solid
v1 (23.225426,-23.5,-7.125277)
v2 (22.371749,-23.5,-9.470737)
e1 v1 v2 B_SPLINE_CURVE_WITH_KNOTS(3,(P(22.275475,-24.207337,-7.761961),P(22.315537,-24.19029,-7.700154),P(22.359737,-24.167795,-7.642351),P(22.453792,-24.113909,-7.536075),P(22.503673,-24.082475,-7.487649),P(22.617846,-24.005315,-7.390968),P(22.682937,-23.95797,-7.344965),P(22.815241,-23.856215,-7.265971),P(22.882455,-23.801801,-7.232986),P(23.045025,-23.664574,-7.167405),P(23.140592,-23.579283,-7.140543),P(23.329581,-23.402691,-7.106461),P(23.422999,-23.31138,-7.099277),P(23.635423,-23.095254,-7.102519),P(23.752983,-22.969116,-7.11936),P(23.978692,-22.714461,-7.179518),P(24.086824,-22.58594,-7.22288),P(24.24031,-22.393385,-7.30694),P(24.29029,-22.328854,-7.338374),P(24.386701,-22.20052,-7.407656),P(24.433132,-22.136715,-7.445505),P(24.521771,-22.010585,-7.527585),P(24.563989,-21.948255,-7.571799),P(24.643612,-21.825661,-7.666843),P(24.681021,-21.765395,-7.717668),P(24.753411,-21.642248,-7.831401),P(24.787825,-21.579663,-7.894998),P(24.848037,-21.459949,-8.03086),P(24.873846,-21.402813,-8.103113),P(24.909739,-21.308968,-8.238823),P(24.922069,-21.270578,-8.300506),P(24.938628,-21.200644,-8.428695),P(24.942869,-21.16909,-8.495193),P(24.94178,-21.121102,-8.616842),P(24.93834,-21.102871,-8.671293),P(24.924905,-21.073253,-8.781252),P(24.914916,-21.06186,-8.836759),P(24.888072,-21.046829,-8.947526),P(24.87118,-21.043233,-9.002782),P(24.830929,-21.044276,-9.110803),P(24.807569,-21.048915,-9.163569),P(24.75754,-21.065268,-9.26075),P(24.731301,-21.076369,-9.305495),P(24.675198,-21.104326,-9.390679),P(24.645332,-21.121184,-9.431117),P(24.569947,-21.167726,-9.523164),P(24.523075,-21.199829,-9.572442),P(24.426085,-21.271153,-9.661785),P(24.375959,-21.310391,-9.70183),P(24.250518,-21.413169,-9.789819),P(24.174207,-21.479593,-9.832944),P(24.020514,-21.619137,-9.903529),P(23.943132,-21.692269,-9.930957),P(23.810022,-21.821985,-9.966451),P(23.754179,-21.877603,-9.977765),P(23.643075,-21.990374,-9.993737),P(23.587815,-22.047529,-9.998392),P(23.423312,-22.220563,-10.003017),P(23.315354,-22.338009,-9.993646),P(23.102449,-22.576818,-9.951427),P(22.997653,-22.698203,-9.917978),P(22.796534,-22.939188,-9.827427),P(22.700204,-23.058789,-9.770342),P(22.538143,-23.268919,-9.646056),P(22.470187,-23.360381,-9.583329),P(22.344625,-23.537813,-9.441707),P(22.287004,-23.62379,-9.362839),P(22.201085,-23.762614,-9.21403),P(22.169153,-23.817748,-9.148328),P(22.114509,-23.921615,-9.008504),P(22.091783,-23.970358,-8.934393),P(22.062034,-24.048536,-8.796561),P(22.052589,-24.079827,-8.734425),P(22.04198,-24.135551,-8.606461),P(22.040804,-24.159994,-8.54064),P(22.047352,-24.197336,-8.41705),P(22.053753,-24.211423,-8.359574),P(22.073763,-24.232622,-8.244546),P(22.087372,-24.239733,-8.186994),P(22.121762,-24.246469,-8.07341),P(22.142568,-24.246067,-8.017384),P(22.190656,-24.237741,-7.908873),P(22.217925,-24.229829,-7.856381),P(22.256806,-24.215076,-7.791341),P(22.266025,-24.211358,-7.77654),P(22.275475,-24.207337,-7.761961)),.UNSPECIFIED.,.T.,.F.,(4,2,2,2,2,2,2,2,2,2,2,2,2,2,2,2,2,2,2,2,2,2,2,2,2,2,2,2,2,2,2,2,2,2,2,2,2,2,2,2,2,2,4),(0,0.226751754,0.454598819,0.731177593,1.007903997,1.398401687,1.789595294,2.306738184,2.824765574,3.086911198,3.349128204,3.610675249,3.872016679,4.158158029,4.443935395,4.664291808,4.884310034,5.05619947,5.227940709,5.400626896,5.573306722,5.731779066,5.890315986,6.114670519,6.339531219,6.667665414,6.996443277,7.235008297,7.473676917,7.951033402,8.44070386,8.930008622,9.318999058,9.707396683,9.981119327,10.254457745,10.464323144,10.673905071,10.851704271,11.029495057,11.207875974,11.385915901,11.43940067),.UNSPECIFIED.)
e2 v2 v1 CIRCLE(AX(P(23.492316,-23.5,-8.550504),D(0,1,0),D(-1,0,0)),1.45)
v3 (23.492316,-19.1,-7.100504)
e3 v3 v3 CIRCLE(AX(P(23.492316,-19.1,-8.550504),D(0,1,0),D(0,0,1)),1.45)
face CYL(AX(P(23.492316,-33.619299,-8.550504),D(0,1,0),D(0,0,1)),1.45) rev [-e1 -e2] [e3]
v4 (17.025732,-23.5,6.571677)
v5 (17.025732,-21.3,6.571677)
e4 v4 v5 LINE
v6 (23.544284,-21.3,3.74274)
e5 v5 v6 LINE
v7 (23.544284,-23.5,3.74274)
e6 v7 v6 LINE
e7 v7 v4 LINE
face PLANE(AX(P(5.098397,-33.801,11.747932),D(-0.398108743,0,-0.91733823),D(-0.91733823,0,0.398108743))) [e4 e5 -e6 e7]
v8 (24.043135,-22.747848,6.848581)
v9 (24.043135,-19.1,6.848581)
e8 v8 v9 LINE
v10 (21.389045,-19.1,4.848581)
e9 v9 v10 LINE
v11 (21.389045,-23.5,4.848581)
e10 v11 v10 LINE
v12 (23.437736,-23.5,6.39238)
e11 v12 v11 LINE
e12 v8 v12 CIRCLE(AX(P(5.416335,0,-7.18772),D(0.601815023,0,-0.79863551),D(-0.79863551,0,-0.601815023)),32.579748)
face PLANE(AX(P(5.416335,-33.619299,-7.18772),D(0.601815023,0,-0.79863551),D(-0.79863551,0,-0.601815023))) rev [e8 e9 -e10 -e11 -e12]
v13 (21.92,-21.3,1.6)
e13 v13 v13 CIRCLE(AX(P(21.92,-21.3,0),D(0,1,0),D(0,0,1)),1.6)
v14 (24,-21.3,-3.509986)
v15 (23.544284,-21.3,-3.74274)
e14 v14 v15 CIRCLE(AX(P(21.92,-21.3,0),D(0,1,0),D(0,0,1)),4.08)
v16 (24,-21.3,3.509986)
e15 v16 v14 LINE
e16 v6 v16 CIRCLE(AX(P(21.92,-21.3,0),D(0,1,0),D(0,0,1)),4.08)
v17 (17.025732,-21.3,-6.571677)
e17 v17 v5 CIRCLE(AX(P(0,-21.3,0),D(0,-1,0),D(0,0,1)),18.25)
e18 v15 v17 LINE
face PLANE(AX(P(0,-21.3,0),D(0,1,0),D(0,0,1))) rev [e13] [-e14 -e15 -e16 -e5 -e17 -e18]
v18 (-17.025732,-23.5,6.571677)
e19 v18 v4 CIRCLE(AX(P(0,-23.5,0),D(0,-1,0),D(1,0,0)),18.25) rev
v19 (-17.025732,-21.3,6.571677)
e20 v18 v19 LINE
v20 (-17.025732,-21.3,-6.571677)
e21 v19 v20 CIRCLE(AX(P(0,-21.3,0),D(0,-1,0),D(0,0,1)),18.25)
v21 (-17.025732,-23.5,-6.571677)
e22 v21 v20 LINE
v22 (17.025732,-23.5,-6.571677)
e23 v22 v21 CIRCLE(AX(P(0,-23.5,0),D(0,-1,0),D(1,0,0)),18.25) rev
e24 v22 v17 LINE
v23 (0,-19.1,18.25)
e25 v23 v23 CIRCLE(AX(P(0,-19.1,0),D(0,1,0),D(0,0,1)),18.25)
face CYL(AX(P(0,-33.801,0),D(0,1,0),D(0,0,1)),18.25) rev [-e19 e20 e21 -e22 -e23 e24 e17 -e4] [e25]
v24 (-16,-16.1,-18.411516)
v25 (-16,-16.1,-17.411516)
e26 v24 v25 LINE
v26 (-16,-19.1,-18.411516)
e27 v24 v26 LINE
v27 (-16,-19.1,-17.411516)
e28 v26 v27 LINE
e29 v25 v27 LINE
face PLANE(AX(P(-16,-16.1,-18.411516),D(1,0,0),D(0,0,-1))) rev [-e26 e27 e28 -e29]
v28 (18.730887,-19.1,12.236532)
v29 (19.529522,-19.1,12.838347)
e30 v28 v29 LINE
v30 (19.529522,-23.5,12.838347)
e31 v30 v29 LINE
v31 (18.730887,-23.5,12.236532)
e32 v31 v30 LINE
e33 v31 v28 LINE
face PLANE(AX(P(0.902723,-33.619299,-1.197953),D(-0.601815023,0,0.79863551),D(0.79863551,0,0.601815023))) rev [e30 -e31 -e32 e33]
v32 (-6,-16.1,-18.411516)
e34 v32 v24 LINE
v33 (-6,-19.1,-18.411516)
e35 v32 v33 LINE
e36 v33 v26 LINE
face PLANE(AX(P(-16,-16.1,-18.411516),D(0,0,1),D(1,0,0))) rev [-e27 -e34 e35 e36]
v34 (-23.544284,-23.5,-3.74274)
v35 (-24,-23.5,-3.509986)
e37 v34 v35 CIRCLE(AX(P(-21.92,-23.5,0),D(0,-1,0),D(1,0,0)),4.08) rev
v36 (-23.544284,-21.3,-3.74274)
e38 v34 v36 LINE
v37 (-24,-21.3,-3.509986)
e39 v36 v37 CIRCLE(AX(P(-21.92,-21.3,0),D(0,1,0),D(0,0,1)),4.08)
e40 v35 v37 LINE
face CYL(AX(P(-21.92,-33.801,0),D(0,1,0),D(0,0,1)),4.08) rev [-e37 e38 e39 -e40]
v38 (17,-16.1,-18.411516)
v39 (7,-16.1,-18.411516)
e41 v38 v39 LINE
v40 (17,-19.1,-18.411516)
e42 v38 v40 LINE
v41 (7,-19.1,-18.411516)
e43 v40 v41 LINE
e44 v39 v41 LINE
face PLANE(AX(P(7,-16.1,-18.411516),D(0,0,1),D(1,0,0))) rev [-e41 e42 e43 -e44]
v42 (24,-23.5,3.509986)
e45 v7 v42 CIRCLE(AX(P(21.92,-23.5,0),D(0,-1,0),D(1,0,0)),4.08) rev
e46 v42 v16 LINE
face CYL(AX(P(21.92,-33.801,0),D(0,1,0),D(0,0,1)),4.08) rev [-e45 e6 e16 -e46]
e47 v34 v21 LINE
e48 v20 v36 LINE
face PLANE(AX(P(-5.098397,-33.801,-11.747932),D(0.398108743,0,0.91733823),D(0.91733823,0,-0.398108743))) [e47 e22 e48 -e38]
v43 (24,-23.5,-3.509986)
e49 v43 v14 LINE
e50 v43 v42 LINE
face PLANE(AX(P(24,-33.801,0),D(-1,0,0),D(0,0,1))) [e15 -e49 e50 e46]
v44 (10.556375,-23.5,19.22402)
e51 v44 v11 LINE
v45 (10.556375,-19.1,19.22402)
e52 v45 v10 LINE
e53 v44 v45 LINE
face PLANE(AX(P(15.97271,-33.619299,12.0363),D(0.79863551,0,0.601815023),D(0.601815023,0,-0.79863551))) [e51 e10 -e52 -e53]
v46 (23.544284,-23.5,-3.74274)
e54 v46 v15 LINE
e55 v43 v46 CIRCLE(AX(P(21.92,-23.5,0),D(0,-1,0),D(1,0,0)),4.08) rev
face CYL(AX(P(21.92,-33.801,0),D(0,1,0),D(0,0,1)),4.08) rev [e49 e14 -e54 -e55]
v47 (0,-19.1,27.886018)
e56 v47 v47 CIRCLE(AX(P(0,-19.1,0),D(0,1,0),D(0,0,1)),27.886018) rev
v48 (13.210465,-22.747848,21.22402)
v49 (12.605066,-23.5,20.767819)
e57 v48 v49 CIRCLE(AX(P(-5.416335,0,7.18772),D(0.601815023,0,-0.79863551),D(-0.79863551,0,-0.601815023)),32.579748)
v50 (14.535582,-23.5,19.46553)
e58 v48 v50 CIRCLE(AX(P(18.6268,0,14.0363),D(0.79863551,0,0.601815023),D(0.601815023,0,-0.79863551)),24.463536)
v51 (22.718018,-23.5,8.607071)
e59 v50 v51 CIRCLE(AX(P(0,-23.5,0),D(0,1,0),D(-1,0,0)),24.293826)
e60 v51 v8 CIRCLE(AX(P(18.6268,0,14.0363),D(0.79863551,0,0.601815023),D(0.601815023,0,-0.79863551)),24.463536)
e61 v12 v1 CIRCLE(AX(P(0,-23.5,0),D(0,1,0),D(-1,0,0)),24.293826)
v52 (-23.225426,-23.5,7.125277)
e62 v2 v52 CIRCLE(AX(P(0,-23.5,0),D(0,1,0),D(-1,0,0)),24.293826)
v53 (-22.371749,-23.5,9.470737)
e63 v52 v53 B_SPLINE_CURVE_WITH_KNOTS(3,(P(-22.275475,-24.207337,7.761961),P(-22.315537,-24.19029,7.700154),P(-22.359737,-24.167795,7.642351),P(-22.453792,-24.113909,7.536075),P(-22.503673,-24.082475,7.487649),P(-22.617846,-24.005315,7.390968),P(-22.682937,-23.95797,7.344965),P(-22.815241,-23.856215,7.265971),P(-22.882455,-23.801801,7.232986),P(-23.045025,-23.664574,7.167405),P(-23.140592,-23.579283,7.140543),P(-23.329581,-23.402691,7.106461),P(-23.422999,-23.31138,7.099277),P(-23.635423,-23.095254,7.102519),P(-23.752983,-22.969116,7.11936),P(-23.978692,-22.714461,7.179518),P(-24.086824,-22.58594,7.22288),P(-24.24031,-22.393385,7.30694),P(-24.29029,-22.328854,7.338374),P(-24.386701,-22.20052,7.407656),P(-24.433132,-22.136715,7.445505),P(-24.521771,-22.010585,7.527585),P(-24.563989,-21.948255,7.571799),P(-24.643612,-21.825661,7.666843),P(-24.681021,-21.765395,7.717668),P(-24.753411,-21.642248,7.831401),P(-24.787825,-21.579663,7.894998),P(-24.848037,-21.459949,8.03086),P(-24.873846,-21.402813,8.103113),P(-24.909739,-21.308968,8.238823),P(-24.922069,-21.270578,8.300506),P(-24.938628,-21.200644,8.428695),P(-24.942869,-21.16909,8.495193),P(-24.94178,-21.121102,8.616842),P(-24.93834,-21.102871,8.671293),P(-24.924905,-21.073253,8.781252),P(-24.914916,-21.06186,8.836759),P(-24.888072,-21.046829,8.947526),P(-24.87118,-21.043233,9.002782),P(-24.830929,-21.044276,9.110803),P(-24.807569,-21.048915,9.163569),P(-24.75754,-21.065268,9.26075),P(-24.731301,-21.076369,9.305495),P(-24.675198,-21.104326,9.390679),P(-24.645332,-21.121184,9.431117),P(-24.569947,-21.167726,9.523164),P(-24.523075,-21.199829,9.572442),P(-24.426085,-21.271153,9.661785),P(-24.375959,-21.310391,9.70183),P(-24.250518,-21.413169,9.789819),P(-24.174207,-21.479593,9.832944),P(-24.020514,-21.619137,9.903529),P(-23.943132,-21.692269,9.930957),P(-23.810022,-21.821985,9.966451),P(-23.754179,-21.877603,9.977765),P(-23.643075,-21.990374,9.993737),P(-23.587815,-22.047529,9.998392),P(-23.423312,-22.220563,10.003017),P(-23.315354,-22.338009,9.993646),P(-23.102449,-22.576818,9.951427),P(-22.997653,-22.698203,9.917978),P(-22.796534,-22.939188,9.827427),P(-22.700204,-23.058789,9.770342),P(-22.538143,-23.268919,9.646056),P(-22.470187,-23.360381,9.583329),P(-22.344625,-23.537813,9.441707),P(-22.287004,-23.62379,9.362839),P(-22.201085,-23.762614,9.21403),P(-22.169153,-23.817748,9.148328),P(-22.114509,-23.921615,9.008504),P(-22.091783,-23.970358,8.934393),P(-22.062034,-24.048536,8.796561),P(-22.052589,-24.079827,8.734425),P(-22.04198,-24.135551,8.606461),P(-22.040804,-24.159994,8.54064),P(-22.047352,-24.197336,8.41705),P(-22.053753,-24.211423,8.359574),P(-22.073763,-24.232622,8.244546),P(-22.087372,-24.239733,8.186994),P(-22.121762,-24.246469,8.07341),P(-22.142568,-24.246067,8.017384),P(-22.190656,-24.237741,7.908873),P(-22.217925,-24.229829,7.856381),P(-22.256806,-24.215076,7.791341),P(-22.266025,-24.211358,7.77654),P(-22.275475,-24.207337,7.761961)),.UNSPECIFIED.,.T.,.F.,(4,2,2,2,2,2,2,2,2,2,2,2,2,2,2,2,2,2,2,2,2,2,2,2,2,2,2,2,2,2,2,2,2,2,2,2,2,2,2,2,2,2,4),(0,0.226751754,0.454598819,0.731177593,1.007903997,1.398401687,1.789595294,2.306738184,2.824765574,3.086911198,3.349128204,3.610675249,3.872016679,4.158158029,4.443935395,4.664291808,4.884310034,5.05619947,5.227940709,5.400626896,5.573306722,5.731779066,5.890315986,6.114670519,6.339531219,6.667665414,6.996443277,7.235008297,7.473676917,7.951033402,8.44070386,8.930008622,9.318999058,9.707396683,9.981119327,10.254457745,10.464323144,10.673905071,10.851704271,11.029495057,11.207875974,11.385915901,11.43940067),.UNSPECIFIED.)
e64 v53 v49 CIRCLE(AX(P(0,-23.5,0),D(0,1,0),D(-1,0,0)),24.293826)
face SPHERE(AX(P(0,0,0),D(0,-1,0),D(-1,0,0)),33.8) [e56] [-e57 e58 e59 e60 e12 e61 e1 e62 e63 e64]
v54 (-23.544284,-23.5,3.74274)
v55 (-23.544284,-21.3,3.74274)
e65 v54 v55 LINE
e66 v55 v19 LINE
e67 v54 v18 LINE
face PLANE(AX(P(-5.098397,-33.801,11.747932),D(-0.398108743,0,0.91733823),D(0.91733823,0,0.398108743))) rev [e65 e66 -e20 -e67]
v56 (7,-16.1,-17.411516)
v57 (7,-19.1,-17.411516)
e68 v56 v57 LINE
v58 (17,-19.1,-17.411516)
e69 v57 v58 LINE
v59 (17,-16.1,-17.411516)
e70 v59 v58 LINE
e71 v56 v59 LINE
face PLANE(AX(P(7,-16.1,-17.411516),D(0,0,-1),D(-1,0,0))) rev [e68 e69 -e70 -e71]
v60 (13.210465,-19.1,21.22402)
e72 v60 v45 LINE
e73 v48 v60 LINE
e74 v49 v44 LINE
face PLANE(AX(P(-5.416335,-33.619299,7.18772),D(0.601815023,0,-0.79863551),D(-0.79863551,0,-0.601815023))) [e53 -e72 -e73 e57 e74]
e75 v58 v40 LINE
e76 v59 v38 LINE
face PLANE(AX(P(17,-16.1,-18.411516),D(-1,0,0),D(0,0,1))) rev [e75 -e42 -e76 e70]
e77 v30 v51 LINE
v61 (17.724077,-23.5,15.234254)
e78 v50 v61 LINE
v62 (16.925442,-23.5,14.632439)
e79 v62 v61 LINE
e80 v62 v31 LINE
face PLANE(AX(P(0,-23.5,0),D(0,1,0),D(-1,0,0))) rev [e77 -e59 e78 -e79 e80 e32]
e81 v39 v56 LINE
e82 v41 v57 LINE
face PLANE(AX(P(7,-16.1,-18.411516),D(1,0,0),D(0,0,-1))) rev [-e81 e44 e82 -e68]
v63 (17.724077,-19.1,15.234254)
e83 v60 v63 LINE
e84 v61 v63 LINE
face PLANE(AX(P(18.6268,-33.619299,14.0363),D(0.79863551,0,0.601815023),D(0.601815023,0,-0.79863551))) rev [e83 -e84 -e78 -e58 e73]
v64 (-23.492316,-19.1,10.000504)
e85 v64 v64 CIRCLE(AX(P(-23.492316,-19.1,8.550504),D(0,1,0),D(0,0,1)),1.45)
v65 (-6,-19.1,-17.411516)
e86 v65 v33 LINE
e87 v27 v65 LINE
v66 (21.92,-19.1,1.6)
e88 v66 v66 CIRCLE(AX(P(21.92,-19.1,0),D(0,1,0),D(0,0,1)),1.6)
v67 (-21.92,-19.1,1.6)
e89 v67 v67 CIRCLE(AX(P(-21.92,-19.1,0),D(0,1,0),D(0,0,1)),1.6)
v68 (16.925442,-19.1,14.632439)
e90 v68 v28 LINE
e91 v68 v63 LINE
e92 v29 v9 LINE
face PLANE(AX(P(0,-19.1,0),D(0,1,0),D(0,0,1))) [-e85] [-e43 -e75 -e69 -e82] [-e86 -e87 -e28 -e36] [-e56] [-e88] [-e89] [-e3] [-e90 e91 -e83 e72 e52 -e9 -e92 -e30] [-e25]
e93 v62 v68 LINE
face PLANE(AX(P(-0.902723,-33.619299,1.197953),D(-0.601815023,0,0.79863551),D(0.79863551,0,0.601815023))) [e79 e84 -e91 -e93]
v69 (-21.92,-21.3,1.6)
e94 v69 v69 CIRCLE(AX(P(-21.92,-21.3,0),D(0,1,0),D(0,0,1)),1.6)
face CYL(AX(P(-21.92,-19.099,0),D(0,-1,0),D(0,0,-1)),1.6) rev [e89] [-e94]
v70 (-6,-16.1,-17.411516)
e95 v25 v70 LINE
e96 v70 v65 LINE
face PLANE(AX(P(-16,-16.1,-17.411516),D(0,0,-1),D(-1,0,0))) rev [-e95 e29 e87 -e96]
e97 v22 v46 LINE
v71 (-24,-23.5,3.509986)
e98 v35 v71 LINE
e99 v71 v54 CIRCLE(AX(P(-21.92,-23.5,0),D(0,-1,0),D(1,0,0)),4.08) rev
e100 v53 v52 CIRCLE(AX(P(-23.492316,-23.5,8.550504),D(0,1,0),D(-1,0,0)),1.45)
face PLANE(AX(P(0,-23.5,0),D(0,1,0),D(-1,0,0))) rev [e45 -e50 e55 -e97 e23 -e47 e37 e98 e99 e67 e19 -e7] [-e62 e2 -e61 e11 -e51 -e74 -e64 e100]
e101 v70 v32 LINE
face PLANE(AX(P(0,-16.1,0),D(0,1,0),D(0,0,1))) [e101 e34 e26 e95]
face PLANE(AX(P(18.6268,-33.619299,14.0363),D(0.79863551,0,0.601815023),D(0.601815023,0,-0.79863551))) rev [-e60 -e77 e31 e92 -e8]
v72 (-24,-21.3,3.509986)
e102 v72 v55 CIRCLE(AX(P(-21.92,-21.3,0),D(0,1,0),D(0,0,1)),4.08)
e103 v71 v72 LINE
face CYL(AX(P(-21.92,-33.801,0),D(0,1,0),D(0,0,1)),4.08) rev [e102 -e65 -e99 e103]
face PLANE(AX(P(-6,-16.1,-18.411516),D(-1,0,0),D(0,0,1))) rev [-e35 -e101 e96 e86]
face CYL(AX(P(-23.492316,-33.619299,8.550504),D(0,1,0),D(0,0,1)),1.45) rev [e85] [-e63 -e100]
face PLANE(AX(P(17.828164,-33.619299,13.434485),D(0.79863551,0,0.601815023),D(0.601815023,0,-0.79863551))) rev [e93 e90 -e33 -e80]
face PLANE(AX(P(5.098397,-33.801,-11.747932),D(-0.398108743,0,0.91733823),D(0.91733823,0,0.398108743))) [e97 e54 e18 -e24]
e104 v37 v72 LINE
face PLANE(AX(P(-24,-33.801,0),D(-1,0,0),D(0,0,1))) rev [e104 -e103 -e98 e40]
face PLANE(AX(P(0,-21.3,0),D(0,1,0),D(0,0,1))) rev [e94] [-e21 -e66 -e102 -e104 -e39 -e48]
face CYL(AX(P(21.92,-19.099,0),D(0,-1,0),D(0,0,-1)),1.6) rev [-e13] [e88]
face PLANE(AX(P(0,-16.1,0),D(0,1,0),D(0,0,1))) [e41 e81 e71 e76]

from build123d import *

# Parameters (mm, degrees)
SKETCH2_R                = 33.8
CUT_EXTRUDE1_DEPTH       = 19.1
CUT_EXTRUDE2_START       = -33.8
CUT_EXTRUDE2_DEPTH       = 14.7
BOSS_EXTRUDE2_START      = -2.2
BOSS_EXTRUDE2_DEPTH      = 2.2
CUT_EXTRUDE3_REACH       = 42.08
SKETCH6_R                = 1.6
SKETCH19_R               = 9
CUT_EXTRUDE10_DEPTH      = 1.4
CUT_EXTRUDE11_REACH      = 42.429
CUT_EXTRUDE11_END_RADIUS = 33.8
SKETCH20_R               = 3.5
CUT_EXTRUDE9_REACH       = 44.024
CUT_EXTRUDE9_END_RADIUS  = 33.8
CUT_EXTRUDE7_REACH       = 44.024
CUT_EXTRUDE7_END_RADIUS  = 33.8
SKETCH10_R               = 1.45
SKETCH14_W               = 10
SKETCH14_H               = 1
BOSS_EXTRUDE1_DEPTH      = 3
CUT_EXTRUDE12_START      = -10.118299
SKETCH21_R               = 27.886018002
CUT_EXTRUDE12_DEPTH      = 10.118299


with BuildPart() as part:
    # Sketch1 → Revolve1 (revolve)
    with BuildSketch(Plane.XY, mode=Mode.PRIVATE) as revolve1_sk:
        with BuildLine():
            Line((0, -33.8), (0, 0))
            Line((0, 0), (33.8, 0))
            ThreePointArc((33.8, 0), (23.900209204, -23.900209204), (0, -33.8))
        make_face()
    revolve(revolve1_sk.sketch.rotate(Axis((0, -33.8, 0), (0, 1, 0)), 180), axis=Axis((0, -33.8, 0), (0, 1, 0)))

    # Sketch2 → Cut-Extrude1 (cut)
    with BuildSketch(Plane(origin=(0, 0, 0), x_dir=(1, 0, 0), z_dir=(0, 1, 0))):
        Circle(SKETCH2_R)
    extrude(amount=-CUT_EXTRUDE1_DEPTH, mode=Mode.SUBTRACT)

    # Sketch5 → Cut-Extrude2 (cut)
    with BuildSketch(Plane(origin=(0, 0, 0), x_dir=(1, 0, 0), z_dir=(0, 1, 0)).offset(CUT_EXTRUDE2_START)):
        with BuildLine():
            Line((-17.025732229, 6.571677263), (-23.544283672, 3.742739979))
            ThreePointArc((-23.544283672, 3.742739979), (-23.775794442, 3.633514413), (-24, 3.509985755))
            Line((-24, 3.509985755), (-24, -3.509985755))
            ThreePointArc((-24, -3.509985755), (-23.775794442, -3.633514413), (-23.544283672, -3.742739979))
            Line((-23.544283672, -3.742739979), (-17.025732229, -6.571677263))
            ThreePointArc((-17.025732229, -6.571677263), (0, -18.25), (17.025732229, -6.571677263))
            Line((17.025732229, -6.571677263), (23.544283672, -3.742739979))
            ThreePointArc((23.544283672, -3.742739979), (23.775794442, -3.633514413), (24, -3.509985755))
            Line((24, -3.509985755), (24, 3.509985755))
            ThreePointArc((24, 3.509985755), (23.775794442, 3.633514413), (23.544283672, 3.742739979))
            Line((23.544283672, 3.742739979), (17.025732229, 6.571677263))
            ThreePointArc((17.025732229, 6.571677263), (0, 18.25), (-17.025732229, 6.571677263))
        make_face()
    extrude(amount=CUT_EXTRUDE2_DEPTH, mode=Mode.SUBTRACT)

    # Sketch16 → Boss-Extrude2 (add)
    with BuildSketch(Plane(origin=(0, -19.1, 0), x_dir=(1, 0, 0), z_dir=(0, 1, 0)).offset(BOSS_EXTRUDE2_START)):
        with BuildLine():
            Line((17.025732229, 6.571677263), (23.544283672, 3.742739979))
            ThreePointArc((23.544283672, 3.742739979), (23.775794442, 3.633514413), (24, 3.509985755))
            Line((24, 3.509985755), (24, -3.509985755))
            ThreePointArc((24, -3.509985755), (23.775794442, -3.633514413), (23.544283672, -3.742739979))
            Line((23.544283672, -3.742739979), (17.025732229, -6.571677263))
            ThreePointArc((17.025732229, -6.571677263), (18.25, 0), (17.025732229, 6.571677263))
        make_face()
        with BuildLine():
            Line((-23.544283672, -3.742739979), (-17.025732229, -6.571677263))
            ThreePointArc((-17.025732229, -6.571677263), (-18.25, 0), (-17.025732229, 6.571677263))
            Line((-17.025732229, 6.571677263), (-23.544283672, 3.742739979))
            ThreePointArc((-23.544283672, 3.742739979), (-23.775794442, 3.633514413), (-24, 3.509985755))
            Line((-24, 3.509985755), (-24, -3.509985755))
            ThreePointArc((-24, -3.509985755), (-23.775794442, -3.633514413), (-23.544283672, -3.742739979))
        make_face()
    extrude(amount=BOSS_EXTRUDE2_DEPTH)

    # Sketch6 → Cut-Extrude3 (cut, up to next)
    with BuildSketch(Plane(origin=(0, -21.3, 0), x_dir=(1, 0, 0), z_dir=(0, 1, 0)), mode=Mode.PRIVATE) as cut_extrude3_sk1:
        with Locations(Location((-21.92, 0, 0), (0, 0, 270))):
            Circle(SKETCH6_R)
    cut_extrude3_tool1 = extrude(cut_extrude3_sk1.sketch, amount=CUT_EXTRUDE3_REACH, mode=Mode.PRIVATE) & part.part
    # Sketch6 → Cut-Extrude3 (cut, up to next)
    with BuildSketch(Plane(origin=(0, -21.3, 0), x_dir=(1, 0, 0), z_dir=(0, 1, 0)), mode=Mode.PRIVATE) as cut_extrude3_sk2:
        with Locations(Location((21.92, 0, 0), (0, 0, 270))):
            Circle(SKETCH6_R)
    cut_extrude3_tool2 = extrude(cut_extrude3_sk2.sketch, amount=CUT_EXTRUDE3_REACH, mode=Mode.PRIVATE) & part.part
    add(cut_extrude3_tool1.solids().sort_by_distance((-21.92, -21.3, 0))[0], mode=Mode.SUBTRACT)
    add(cut_extrude3_tool2.solids().sort_by_distance((21.92, -21.3, 0))[0], mode=Mode.SUBTRACT)

    # Revolve2: read off the stored shape, not the designer's step
    # Revolve2 outline → Revolve2 (revolve)
    with BuildSketch(Plane.XY):
        with BuildLine():
            Line((0, -23.5), (0, -33.8))
            ThreePointArc((0, -33.8), (13.168073663, -31.129436808), (24.255308697, -23.53975361))
            Line((24.255308697, -23.53975361), (24.255308697, -23.5))
            Line((24.255308697, -23.5), (0, -23.5))
        make_face()
    revolve(axis=Axis((0, 0, 0), (0, 1, 0)))

    # Sketch19 → Cut-Extrude10 (cut)
    with BuildSketch(Plane(origin=(0, -23.5, 0), x_dir=(1, 0, 0), z_dir=(0, 1, 0))):
        with Locations(Location((0, 0, 0), (0, 0, 180))):
            Circle(SKETCH19_R)
    extrude(amount=-CUT_EXTRUDE10_DEPTH, mode=Mode.SUBTRACT)

    # Cut-Extrude11: up to this sphere (the profile starts inside it)
    cut_extrude11_end = Location((0, 0, 0)) * Sphere(CUT_EXTRUDE11_END_RADIUS, mode=Mode.PRIVATE)
    # Sketch20 → Cut-Extrude11 (cut, up to the surface)
    with BuildSketch(Plane(origin=(0, -24.9, 0), x_dir=(1, 0, 0), z_dir=(0, 1, 0)), mode=Mode.PRIVATE) as cut_extrude11_sk1:
        with Locations(Location((0, 0, 0), (0, 0, 180))):
            Circle(SKETCH20_R)
    cut_extrude11_tool1 = extrude(cut_extrude11_sk1.sketch, amount=-CUT_EXTRUDE11_REACH, mode=Mode.PRIVATE) & cut_extrude11_end
    add(cut_extrude11_tool1.solids().sort_by_distance((0, -24.9, 0))[0], mode=Mode.SUBTRACT)

    # Cut-Extrude9: up to this sphere (the profile starts inside it)
    cut_extrude9_end = Location((0, 0, 0)) * Sphere(CUT_EXTRUDE9_END_RADIUS, mode=Mode.PRIVATE)
    # Sketch13 → Cut-Extrude9 (cut, up to the surface)
    with BuildSketch(Plane(origin=(0, -19.1, 0), x_dir=(1, 0, 0), z_dir=(0, 1, 0)), mode=Mode.PRIVATE) as cut_extrude9_sk1:
        Polygon((10.556374993, -19.224020053), (13.210464636, -21.224020053), (17.724077309, -15.234253728), (16.925441799, -14.632438705), (18.730886869, -12.236532175), (19.529522379, -12.838347198), (24.043135053, -6.848580873), (21.389045409, -4.848580873), align=None)
    cut_extrude9_tool1 = extrude(cut_extrude9_sk1.sketch, amount=-CUT_EXTRUDE9_REACH, mode=Mode.PRIVATE) & cut_extrude9_end
    add(cut_extrude9_tool1.solids().sort_by_distance((17.250772, -19.1, 12.999389))[0], mode=Mode.SUBTRACT)

    # Cut-Extrude7: up to this sphere (the profile starts inside it)
    cut_extrude7_end = Location((0, 0, 0)) * Sphere(CUT_EXTRUDE7_END_RADIUS, mode=Mode.PRIVATE)
    # Sketch10 → Cut-Extrude7 (cut, up to the surface)
    with BuildSketch(Plane(origin=(0, -19.1, 0), x_dir=(1, 0, 0), z_dir=(0, 1, 0)), mode=Mode.PRIVATE) as cut_extrude7_sk1:
        with Locations(Location((-23.49231552, -8.550503583, 0), (0, 0, 270))):
            Circle(SKETCH10_R)
    cut_extrude7_tool1 = extrude(cut_extrude7_sk1.sketch, amount=-CUT_EXTRUDE7_REACH, mode=Mode.PRIVATE) & cut_extrude7_end
    add(cut_extrude7_tool1.solids().sort_by_distance((-23.492316, -19.1, 8.550504))[0], mode=Mode.SUBTRACT)
    # Sketch10 → Cut-Extrude7 (cut, up to the surface)
    with BuildSketch(Plane(origin=(0, -19.1, 0), x_dir=(1, 0, 0), z_dir=(0, 1, 0)), mode=Mode.PRIVATE) as cut_extrude7_sk2:
        with Locations(Location((23.49231552, 8.550503583, 0), (0, 0, 270))):
            Circle(SKETCH10_R)
    cut_extrude7_tool2 = extrude(cut_extrude7_sk2.sketch, amount=-CUT_EXTRUDE7_REACH, mode=Mode.PRIVATE) & cut_extrude7_end
    add(cut_extrude7_tool2.solids().sort_by_distance((23.492316, -19.1, -8.550504))[0], mode=Mode.SUBTRACT)

    # Sketch14 → Boss-Extrude1 (add)
    with BuildSketch(Plane(origin=(0, -19.1, 0), x_dir=(1, 0, 0), z_dir=(0, 1, 0))):
        with Locations((12, 17.911516357)):
            Rectangle(SKETCH14_W, SKETCH14_H)
        with Locations((-11, 17.911516357)):
            Rectangle(SKETCH14_W, SKETCH14_H)
    extrude(amount=BOSS_EXTRUDE1_DEPTH)

    # Sketch21 → Cut-Extrude12 (cut)
    with BuildSketch(Plane(origin=(0, -23.5, 0), x_dir=(1, 0, 0), z_dir=(0, 1, 0)).offset(CUT_EXTRUDE12_START)):
        Circle(SKETCH21_R)
    extrude(amount=CUT_EXTRUDE12_DEPTH, mode=Mode.SUBTRACT)


solid = part.part
